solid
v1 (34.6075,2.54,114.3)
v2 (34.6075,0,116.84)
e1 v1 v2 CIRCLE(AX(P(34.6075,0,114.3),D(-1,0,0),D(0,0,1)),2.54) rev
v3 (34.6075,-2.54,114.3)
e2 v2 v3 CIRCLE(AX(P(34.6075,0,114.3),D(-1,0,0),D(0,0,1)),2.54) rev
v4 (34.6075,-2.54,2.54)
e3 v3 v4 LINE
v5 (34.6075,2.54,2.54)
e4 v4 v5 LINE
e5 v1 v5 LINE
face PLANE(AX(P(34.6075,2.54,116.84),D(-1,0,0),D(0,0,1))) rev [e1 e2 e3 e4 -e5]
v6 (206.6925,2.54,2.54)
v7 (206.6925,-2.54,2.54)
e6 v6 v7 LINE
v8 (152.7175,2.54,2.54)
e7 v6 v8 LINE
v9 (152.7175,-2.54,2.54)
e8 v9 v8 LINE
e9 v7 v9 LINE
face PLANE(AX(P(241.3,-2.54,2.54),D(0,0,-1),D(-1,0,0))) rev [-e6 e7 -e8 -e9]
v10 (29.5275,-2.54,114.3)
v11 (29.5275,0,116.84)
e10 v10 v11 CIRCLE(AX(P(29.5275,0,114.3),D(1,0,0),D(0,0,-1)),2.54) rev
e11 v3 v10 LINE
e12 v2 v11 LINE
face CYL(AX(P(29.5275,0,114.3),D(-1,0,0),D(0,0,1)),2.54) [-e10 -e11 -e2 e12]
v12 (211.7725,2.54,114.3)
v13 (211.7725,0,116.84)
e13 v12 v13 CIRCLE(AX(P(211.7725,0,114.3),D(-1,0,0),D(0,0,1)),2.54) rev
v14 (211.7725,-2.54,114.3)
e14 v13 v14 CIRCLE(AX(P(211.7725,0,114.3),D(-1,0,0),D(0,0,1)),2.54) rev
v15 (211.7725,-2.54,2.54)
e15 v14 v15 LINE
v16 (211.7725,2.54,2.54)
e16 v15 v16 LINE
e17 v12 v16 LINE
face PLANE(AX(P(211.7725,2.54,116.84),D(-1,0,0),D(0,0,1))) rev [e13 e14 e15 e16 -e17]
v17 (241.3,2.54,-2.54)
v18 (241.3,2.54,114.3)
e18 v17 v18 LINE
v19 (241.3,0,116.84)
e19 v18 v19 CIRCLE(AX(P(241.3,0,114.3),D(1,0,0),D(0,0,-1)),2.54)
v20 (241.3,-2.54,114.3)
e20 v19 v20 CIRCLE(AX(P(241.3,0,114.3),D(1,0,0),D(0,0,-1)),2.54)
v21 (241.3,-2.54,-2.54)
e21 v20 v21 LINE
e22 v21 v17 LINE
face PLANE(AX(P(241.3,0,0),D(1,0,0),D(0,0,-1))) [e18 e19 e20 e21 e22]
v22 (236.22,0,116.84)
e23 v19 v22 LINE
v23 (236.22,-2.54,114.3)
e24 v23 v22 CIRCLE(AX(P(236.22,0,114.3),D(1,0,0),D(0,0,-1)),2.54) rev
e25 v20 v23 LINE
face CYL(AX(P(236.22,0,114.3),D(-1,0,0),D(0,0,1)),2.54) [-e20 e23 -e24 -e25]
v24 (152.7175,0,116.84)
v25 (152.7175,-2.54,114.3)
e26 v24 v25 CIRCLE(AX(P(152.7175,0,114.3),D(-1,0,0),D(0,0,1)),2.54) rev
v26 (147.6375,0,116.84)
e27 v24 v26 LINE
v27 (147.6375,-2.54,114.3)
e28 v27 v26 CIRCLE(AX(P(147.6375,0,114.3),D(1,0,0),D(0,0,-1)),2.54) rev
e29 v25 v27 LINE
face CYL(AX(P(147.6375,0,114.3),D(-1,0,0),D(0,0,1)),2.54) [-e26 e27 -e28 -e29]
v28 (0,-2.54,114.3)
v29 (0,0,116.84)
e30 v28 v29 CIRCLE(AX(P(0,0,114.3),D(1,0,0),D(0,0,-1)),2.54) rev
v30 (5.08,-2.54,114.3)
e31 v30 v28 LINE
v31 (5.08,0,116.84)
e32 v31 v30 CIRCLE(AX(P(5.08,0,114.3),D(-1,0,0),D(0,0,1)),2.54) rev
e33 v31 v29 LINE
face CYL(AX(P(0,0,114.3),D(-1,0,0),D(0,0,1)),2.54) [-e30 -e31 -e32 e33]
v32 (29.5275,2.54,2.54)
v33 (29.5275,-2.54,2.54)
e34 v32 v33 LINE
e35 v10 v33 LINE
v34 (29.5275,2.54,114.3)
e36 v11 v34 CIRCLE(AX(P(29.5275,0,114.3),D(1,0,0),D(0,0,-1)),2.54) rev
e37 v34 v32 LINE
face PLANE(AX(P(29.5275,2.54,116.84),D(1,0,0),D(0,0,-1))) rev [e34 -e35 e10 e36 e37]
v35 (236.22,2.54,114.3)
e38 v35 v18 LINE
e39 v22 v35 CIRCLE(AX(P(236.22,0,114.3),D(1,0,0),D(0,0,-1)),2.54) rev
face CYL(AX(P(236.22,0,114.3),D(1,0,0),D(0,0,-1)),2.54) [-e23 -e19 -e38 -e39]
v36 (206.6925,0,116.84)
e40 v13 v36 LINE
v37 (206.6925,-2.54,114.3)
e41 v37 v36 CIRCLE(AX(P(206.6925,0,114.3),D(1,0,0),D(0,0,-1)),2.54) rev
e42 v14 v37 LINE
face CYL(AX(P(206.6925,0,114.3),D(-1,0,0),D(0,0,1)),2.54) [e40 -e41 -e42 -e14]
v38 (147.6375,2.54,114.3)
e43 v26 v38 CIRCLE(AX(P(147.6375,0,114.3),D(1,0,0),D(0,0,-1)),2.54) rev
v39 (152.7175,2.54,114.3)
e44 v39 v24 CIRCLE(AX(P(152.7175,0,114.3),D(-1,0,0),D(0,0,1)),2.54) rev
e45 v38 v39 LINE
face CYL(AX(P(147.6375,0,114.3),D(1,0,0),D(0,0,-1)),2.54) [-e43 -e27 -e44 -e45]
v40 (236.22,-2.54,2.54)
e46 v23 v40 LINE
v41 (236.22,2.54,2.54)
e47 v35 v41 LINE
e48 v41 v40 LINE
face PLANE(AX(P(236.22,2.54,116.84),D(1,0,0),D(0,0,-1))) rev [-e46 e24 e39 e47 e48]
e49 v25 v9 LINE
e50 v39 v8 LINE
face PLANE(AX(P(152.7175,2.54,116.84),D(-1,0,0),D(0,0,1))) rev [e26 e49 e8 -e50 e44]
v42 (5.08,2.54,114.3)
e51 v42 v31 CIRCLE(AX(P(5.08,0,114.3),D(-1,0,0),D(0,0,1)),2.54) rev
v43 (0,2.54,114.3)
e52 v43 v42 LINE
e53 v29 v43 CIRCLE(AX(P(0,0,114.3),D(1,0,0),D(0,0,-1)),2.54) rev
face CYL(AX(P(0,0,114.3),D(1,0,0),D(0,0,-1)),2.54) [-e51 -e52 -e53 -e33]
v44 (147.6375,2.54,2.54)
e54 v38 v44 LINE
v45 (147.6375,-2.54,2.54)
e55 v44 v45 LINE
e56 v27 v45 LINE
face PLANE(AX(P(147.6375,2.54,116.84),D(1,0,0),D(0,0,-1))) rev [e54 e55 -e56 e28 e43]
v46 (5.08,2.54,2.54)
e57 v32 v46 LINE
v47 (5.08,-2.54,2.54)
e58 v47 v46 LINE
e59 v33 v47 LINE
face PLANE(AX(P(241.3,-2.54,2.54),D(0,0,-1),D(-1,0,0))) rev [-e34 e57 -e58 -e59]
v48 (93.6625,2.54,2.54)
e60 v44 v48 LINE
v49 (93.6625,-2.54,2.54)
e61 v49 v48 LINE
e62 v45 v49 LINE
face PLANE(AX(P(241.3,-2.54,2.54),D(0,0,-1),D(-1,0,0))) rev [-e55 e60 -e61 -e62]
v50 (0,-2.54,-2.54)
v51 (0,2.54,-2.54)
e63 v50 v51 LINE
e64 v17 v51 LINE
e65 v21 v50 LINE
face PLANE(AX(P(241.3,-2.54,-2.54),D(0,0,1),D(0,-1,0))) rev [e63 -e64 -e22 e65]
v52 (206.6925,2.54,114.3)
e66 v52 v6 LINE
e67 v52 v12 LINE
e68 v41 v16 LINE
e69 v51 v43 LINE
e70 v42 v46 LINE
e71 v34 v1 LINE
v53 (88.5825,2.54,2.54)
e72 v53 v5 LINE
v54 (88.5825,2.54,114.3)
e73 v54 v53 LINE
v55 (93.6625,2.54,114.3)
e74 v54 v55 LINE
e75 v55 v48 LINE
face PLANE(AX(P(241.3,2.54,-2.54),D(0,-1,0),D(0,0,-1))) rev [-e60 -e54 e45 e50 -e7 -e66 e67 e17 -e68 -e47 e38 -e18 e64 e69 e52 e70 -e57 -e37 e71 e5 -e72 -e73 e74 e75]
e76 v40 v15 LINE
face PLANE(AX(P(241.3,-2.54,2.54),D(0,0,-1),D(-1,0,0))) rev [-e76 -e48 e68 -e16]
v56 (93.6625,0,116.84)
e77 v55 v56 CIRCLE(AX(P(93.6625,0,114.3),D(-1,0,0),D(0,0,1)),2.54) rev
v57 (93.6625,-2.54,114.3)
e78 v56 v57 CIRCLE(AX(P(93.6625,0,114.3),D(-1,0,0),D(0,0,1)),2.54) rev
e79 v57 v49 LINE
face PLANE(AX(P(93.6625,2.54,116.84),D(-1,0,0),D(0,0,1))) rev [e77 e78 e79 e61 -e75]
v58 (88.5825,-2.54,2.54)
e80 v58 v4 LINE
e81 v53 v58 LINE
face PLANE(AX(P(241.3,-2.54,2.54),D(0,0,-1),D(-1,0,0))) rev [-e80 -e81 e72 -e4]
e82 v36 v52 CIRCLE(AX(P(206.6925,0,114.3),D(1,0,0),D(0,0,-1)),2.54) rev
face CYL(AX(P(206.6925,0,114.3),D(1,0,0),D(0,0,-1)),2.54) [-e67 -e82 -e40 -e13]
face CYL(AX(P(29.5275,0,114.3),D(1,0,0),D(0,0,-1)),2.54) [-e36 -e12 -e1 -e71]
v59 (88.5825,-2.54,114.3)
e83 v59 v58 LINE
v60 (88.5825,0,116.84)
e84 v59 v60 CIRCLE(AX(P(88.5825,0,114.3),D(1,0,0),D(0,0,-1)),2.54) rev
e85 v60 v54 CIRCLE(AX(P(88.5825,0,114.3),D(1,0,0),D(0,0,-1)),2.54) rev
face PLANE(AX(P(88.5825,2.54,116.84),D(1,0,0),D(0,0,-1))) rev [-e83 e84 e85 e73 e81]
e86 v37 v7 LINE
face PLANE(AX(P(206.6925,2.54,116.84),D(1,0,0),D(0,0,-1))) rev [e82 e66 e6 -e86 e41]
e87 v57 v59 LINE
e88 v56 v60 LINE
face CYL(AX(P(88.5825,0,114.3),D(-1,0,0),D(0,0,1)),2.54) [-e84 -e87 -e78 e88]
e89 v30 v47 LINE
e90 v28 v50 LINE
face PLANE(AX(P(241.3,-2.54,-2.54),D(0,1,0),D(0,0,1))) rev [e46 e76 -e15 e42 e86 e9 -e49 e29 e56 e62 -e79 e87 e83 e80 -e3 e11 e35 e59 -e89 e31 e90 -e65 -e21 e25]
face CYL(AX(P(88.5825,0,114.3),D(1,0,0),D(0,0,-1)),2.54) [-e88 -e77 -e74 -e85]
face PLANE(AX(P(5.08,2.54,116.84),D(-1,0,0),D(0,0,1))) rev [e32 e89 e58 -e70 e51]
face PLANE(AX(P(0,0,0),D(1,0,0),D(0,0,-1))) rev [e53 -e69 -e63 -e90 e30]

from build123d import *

# Parameters (mm, degrees)
SKETCH1_W              = 5.08
SKETCH1_H              = 5.08
BOSS_EXTRUDE1_DEPTH    = 241.3
SKETCH2_W              = 5.08
SKETCH2_H              = 5.08
BOSS_EXTRUDE2_DEPTH    = 116.84
FILLET1_R              = 2.54
LPATTERN1_COUNT        = 9
LPATTERN1_PITCH        = 29.5275
FILLET1_OF_LPATTERN1_R = 2.54


with BuildPart() as part:
    # Sketch1 → Boss-Extrude1 (new body)
    with BuildSketch(Plane(origin=(0, 0, 0), x_dir=(0, 0, -1), z_dir=(1, 0, 0))):
        Rectangle(SKETCH1_W, SKETCH1_H)
    extrude(amount=BOSS_EXTRUDE1_DEPTH)

    # Sketch2 → Boss-Extrude2 (add)
    with BuildSketch(Plane.XY):
        with Locations((2.54, 0)):
            Rectangle(SKETCH2_W, SKETCH2_H)
    boss_extrude2 = extrude(amount=BOSS_EXTRUDE2_DEPTH)

    # Fillet1
    fillet1_edges = [part.edges().sort_by_distance(p)[0] for p in [
        (2.54, -2.54, 116.84),
        (2.54, 2.54, 116.84),
    ]]
    fillet(fillet1_edges, radius=FILLET1_R - 0.0001)  # a hair under: the kernel refuses the full size

    # LPattern1: Boss-Extrude2 ×9, 3 skipped
    with Locations(*[(i * LPATTERN1_PITCH, 0, 0) for i in range(1, LPATTERN1_COUNT) if i not in (2, 4, 6)]):
        add(boss_extrude2)

    # Fillet1 of LPattern1
    fillet1_of_lpattern1_edges = [part.edges().sort_by_distance(p)[0] for p in [
        (32.0675, -2.54, 116.84),
        (32.0675, 2.54, 116.84),
        (91.1225, -2.54, 116.84),
        (91.1225, 2.54, 116.84),
        (150.1775, -2.54, 116.84),
        (150.1775, 2.54, 116.84),
        (209.2325, -2.54, 116.84),
        (209.2325, 2.54, 116.84),
        (238.76, -2.54, 116.84),
        (238.76, 2.54, 116.84),
    ]]
    fillet(fillet1_of_lpattern1_edges, radius=FILLET1_OF_LPATTERN1_R - 0.0001)  # a hair under: the kernel refuses the full size


solid = part.part
